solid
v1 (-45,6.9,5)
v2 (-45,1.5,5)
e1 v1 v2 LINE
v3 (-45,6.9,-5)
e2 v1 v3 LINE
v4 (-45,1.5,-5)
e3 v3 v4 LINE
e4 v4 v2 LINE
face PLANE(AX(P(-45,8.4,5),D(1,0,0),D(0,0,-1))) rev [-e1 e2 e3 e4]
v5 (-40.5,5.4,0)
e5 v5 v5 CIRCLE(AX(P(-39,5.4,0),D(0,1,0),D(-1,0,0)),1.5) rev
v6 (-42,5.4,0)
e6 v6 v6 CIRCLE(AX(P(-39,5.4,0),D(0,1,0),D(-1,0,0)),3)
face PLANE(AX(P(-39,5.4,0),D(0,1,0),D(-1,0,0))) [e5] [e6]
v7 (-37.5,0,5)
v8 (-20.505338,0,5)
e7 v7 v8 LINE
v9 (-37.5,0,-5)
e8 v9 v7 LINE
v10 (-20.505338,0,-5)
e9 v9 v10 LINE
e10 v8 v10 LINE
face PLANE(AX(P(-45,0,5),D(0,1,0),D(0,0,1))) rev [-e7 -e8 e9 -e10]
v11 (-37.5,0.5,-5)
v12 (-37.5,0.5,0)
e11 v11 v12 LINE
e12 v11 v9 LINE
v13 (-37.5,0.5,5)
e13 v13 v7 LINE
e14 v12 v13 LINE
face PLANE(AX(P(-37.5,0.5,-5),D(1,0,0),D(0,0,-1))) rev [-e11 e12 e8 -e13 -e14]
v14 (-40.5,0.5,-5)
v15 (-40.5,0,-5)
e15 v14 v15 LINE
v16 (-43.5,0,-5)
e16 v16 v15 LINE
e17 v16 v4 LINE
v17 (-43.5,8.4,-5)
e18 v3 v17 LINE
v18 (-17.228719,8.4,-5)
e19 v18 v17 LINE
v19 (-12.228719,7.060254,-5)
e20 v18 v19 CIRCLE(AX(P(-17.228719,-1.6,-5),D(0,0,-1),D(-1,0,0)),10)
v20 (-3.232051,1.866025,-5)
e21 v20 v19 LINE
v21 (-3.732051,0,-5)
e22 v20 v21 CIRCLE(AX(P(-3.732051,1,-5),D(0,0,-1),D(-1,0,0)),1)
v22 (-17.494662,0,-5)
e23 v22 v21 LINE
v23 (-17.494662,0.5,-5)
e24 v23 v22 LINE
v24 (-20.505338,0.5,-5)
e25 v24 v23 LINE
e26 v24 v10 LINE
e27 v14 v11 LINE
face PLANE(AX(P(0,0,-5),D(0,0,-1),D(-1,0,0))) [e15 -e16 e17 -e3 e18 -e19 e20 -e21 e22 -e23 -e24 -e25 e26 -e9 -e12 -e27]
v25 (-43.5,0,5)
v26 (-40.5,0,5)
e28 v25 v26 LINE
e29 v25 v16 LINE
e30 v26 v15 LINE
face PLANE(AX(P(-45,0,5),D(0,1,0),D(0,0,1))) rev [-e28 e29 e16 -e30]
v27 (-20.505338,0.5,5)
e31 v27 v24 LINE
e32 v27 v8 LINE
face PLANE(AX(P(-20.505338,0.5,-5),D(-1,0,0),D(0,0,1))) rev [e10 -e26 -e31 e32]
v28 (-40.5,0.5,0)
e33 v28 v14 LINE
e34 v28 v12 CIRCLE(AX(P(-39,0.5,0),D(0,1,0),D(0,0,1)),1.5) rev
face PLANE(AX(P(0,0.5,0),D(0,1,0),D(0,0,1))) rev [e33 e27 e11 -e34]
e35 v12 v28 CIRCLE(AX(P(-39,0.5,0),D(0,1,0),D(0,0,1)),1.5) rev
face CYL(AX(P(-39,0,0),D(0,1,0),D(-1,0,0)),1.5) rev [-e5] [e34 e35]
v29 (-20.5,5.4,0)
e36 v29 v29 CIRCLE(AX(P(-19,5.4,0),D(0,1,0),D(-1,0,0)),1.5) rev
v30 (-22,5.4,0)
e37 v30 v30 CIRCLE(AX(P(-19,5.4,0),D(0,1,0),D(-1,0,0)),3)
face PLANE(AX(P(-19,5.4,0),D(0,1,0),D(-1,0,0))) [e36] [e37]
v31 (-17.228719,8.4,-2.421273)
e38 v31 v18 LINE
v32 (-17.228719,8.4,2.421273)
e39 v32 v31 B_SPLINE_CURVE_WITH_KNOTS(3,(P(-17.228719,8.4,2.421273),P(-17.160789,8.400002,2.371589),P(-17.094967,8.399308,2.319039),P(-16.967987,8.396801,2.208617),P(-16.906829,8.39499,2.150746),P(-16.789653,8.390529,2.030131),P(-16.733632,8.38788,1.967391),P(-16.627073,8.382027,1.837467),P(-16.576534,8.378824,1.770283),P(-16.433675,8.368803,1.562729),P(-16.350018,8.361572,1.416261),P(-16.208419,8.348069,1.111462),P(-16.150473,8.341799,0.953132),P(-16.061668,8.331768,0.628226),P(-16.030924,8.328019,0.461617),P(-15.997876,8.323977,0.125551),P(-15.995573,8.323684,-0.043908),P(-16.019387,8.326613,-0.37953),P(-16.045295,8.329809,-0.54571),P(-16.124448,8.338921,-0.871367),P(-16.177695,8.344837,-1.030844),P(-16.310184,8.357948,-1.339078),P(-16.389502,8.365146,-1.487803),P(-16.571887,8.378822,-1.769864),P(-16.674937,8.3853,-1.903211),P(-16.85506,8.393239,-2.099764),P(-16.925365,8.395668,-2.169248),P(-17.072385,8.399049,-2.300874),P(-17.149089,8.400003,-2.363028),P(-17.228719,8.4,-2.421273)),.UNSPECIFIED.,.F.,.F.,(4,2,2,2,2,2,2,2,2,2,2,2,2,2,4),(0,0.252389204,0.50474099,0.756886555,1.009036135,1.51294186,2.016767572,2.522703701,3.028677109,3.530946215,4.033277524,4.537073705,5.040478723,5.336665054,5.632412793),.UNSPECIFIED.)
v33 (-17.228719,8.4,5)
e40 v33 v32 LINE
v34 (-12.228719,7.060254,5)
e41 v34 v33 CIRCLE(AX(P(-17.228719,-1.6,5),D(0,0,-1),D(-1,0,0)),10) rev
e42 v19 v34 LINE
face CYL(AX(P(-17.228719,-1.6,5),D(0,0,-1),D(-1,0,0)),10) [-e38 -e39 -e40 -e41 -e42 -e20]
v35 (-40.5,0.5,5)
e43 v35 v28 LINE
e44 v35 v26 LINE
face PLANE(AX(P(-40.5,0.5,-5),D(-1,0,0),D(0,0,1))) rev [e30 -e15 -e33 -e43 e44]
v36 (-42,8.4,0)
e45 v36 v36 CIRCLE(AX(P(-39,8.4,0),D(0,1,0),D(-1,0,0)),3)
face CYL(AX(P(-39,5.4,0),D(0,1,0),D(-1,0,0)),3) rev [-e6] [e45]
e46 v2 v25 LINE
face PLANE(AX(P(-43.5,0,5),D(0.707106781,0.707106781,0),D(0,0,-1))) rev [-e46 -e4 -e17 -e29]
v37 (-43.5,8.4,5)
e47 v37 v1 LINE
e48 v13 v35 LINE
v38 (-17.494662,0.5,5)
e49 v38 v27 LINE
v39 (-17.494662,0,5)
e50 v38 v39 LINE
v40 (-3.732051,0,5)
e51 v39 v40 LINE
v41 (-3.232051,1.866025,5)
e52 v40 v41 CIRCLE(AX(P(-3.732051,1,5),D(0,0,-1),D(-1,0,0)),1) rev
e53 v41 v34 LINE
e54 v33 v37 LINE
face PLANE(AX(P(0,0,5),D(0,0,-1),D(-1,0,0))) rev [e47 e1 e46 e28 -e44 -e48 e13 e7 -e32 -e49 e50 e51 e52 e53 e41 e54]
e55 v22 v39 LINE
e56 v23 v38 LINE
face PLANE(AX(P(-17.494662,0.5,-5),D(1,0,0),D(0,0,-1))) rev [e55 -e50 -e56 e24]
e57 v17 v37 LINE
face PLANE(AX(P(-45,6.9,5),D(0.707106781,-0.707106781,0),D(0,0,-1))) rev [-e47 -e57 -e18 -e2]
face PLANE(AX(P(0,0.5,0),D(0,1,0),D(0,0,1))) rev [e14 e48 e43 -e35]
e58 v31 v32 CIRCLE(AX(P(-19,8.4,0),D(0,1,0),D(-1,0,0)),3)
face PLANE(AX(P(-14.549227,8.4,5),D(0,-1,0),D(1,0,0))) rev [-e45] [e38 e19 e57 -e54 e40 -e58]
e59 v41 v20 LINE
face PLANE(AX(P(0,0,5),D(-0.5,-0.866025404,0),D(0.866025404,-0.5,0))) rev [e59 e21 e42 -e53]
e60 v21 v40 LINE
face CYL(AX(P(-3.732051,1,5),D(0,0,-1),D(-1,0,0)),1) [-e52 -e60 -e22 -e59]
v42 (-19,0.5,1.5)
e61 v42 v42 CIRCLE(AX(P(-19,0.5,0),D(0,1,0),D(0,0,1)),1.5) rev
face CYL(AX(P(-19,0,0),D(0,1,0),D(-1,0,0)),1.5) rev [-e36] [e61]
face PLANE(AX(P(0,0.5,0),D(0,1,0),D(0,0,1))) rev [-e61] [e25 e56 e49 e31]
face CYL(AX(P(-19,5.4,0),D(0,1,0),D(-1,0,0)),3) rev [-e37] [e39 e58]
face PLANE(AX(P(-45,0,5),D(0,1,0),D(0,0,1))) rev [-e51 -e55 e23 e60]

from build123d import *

# Parameters (mm, degrees)
EXTRUDE_1_DEPTH     = 5
SKETCH_2_R          = 1.5
CUT_EXTRUDE_1_DEPTH = 47.049538543
SKETCH_3_R          = 3
CUT_EXTRUDE_2_DEPTH = 3
FILLET_1_R          = 10
FILLET_2_R          = 1
CHAMFER_1_SIZE      = 1.5
SKETCH_4_W          = 3
SKETCH_4_H          = 10
SKETCH_4_W_2        = 3.010676302
CUT_EXTRUDE_3_DEPTH = 0.5


with BuildPart() as part:
    # 草图1 → 凸台-拉伸1 (new, symmetric)
    with BuildSketch(Plane.XY):
        Polygon((0, 0), (-14.549226784, 8.4), (-45, 8.4), (-45, 0), align=None)
    extrude(amount=EXTRUDE_1_DEPTH, both=True)

    # 草图2 → 切除-拉伸1 (cut, through all)
    with BuildSketch(Plane(origin=(0, 8.4, 0), x_dir=(1, 0, 0), z_dir=(0, 1, 0))):
        with Locations(Location((-39, 0, 0), (0, 0, 180))):
            Circle(SKETCH_2_R)
        with Locations(Location((-19, 0, 0), (0, 0, 180))):
            Circle(SKETCH_2_R)
    extrude(amount=-CUT_EXTRUDE_1_DEPTH, mode=Mode.SUBTRACT)

    # 草图3 → 切除-拉伸2 (cut)
    with BuildSketch(Plane(origin=(0, 8.4, 0), x_dir=(1, 0, 0), z_dir=(0, 1, 0))):
        with Locations(Location((-39, 0, 0), (0, 0, 180))):
            Circle(SKETCH_3_R)
        with Locations(Location((-19, 0, 0), (0, 0, 180))):
            Circle(SKETCH_3_R)
    extrude(amount=-CUT_EXTRUDE_2_DEPTH, mode=Mode.SUBTRACT)

    # 圆角1
    # the kernel refuses this fillet: 10 mm, written as the material it takes off along each edge
    with BuildSketch(Plane(origin=(-14.549226784, 8.4, -11.698729811), x_dir=(0.8660254037844417, -0.4999999999999948, 0), z_dir=(0, 0, 1))) as fillet_1_piece_1:
        with BuildLine():
            CenterArc((FILLET_1_R * 0.267949192431, -FILLET_1_R), FILLET_1_R, 90, 30)
            Line((-FILLET_1_R * 0.232050807569, -FILLET_1_R * 0.133974596216), (0, 0))
            Line((0, 0), (FILLET_1_R * 0.267949192431, 0))
        make_face()
    extrude(amount=23.397459622, mode=Mode.SUBTRACT)

    # 圆角2
    fillet_2_edges = [part.edges().sort_by_distance(p)[0] for p in [
        (0, 0, 0),
    ]]
    fillet(fillet_2_edges, radius=FILLET_2_R)

    # 倒角1
    chamfer_1_edges = [part.edges().sort_by_distance(p)[0] for p in [
        (-45, 0, 0),
        (-45, 8.4, 0),
    ]]
    chamfer(chamfer_1_edges, length=CHAMFER_1_SIZE)

    # 草图4 → 切除-拉伸3 (cut)
    with BuildSketch(Plane.XZ):
        with Locations((-39, 0)):
            Rectangle(SKETCH_4_W, SKETCH_4_H)
        with Locations((-19, 0)):
            Rectangle(SKETCH_4_W_2, SKETCH_4_H)
    extrude(amount=-CUT_EXTRUDE_3_DEPTH, mode=Mode.SUBTRACT)


solid = part.part
